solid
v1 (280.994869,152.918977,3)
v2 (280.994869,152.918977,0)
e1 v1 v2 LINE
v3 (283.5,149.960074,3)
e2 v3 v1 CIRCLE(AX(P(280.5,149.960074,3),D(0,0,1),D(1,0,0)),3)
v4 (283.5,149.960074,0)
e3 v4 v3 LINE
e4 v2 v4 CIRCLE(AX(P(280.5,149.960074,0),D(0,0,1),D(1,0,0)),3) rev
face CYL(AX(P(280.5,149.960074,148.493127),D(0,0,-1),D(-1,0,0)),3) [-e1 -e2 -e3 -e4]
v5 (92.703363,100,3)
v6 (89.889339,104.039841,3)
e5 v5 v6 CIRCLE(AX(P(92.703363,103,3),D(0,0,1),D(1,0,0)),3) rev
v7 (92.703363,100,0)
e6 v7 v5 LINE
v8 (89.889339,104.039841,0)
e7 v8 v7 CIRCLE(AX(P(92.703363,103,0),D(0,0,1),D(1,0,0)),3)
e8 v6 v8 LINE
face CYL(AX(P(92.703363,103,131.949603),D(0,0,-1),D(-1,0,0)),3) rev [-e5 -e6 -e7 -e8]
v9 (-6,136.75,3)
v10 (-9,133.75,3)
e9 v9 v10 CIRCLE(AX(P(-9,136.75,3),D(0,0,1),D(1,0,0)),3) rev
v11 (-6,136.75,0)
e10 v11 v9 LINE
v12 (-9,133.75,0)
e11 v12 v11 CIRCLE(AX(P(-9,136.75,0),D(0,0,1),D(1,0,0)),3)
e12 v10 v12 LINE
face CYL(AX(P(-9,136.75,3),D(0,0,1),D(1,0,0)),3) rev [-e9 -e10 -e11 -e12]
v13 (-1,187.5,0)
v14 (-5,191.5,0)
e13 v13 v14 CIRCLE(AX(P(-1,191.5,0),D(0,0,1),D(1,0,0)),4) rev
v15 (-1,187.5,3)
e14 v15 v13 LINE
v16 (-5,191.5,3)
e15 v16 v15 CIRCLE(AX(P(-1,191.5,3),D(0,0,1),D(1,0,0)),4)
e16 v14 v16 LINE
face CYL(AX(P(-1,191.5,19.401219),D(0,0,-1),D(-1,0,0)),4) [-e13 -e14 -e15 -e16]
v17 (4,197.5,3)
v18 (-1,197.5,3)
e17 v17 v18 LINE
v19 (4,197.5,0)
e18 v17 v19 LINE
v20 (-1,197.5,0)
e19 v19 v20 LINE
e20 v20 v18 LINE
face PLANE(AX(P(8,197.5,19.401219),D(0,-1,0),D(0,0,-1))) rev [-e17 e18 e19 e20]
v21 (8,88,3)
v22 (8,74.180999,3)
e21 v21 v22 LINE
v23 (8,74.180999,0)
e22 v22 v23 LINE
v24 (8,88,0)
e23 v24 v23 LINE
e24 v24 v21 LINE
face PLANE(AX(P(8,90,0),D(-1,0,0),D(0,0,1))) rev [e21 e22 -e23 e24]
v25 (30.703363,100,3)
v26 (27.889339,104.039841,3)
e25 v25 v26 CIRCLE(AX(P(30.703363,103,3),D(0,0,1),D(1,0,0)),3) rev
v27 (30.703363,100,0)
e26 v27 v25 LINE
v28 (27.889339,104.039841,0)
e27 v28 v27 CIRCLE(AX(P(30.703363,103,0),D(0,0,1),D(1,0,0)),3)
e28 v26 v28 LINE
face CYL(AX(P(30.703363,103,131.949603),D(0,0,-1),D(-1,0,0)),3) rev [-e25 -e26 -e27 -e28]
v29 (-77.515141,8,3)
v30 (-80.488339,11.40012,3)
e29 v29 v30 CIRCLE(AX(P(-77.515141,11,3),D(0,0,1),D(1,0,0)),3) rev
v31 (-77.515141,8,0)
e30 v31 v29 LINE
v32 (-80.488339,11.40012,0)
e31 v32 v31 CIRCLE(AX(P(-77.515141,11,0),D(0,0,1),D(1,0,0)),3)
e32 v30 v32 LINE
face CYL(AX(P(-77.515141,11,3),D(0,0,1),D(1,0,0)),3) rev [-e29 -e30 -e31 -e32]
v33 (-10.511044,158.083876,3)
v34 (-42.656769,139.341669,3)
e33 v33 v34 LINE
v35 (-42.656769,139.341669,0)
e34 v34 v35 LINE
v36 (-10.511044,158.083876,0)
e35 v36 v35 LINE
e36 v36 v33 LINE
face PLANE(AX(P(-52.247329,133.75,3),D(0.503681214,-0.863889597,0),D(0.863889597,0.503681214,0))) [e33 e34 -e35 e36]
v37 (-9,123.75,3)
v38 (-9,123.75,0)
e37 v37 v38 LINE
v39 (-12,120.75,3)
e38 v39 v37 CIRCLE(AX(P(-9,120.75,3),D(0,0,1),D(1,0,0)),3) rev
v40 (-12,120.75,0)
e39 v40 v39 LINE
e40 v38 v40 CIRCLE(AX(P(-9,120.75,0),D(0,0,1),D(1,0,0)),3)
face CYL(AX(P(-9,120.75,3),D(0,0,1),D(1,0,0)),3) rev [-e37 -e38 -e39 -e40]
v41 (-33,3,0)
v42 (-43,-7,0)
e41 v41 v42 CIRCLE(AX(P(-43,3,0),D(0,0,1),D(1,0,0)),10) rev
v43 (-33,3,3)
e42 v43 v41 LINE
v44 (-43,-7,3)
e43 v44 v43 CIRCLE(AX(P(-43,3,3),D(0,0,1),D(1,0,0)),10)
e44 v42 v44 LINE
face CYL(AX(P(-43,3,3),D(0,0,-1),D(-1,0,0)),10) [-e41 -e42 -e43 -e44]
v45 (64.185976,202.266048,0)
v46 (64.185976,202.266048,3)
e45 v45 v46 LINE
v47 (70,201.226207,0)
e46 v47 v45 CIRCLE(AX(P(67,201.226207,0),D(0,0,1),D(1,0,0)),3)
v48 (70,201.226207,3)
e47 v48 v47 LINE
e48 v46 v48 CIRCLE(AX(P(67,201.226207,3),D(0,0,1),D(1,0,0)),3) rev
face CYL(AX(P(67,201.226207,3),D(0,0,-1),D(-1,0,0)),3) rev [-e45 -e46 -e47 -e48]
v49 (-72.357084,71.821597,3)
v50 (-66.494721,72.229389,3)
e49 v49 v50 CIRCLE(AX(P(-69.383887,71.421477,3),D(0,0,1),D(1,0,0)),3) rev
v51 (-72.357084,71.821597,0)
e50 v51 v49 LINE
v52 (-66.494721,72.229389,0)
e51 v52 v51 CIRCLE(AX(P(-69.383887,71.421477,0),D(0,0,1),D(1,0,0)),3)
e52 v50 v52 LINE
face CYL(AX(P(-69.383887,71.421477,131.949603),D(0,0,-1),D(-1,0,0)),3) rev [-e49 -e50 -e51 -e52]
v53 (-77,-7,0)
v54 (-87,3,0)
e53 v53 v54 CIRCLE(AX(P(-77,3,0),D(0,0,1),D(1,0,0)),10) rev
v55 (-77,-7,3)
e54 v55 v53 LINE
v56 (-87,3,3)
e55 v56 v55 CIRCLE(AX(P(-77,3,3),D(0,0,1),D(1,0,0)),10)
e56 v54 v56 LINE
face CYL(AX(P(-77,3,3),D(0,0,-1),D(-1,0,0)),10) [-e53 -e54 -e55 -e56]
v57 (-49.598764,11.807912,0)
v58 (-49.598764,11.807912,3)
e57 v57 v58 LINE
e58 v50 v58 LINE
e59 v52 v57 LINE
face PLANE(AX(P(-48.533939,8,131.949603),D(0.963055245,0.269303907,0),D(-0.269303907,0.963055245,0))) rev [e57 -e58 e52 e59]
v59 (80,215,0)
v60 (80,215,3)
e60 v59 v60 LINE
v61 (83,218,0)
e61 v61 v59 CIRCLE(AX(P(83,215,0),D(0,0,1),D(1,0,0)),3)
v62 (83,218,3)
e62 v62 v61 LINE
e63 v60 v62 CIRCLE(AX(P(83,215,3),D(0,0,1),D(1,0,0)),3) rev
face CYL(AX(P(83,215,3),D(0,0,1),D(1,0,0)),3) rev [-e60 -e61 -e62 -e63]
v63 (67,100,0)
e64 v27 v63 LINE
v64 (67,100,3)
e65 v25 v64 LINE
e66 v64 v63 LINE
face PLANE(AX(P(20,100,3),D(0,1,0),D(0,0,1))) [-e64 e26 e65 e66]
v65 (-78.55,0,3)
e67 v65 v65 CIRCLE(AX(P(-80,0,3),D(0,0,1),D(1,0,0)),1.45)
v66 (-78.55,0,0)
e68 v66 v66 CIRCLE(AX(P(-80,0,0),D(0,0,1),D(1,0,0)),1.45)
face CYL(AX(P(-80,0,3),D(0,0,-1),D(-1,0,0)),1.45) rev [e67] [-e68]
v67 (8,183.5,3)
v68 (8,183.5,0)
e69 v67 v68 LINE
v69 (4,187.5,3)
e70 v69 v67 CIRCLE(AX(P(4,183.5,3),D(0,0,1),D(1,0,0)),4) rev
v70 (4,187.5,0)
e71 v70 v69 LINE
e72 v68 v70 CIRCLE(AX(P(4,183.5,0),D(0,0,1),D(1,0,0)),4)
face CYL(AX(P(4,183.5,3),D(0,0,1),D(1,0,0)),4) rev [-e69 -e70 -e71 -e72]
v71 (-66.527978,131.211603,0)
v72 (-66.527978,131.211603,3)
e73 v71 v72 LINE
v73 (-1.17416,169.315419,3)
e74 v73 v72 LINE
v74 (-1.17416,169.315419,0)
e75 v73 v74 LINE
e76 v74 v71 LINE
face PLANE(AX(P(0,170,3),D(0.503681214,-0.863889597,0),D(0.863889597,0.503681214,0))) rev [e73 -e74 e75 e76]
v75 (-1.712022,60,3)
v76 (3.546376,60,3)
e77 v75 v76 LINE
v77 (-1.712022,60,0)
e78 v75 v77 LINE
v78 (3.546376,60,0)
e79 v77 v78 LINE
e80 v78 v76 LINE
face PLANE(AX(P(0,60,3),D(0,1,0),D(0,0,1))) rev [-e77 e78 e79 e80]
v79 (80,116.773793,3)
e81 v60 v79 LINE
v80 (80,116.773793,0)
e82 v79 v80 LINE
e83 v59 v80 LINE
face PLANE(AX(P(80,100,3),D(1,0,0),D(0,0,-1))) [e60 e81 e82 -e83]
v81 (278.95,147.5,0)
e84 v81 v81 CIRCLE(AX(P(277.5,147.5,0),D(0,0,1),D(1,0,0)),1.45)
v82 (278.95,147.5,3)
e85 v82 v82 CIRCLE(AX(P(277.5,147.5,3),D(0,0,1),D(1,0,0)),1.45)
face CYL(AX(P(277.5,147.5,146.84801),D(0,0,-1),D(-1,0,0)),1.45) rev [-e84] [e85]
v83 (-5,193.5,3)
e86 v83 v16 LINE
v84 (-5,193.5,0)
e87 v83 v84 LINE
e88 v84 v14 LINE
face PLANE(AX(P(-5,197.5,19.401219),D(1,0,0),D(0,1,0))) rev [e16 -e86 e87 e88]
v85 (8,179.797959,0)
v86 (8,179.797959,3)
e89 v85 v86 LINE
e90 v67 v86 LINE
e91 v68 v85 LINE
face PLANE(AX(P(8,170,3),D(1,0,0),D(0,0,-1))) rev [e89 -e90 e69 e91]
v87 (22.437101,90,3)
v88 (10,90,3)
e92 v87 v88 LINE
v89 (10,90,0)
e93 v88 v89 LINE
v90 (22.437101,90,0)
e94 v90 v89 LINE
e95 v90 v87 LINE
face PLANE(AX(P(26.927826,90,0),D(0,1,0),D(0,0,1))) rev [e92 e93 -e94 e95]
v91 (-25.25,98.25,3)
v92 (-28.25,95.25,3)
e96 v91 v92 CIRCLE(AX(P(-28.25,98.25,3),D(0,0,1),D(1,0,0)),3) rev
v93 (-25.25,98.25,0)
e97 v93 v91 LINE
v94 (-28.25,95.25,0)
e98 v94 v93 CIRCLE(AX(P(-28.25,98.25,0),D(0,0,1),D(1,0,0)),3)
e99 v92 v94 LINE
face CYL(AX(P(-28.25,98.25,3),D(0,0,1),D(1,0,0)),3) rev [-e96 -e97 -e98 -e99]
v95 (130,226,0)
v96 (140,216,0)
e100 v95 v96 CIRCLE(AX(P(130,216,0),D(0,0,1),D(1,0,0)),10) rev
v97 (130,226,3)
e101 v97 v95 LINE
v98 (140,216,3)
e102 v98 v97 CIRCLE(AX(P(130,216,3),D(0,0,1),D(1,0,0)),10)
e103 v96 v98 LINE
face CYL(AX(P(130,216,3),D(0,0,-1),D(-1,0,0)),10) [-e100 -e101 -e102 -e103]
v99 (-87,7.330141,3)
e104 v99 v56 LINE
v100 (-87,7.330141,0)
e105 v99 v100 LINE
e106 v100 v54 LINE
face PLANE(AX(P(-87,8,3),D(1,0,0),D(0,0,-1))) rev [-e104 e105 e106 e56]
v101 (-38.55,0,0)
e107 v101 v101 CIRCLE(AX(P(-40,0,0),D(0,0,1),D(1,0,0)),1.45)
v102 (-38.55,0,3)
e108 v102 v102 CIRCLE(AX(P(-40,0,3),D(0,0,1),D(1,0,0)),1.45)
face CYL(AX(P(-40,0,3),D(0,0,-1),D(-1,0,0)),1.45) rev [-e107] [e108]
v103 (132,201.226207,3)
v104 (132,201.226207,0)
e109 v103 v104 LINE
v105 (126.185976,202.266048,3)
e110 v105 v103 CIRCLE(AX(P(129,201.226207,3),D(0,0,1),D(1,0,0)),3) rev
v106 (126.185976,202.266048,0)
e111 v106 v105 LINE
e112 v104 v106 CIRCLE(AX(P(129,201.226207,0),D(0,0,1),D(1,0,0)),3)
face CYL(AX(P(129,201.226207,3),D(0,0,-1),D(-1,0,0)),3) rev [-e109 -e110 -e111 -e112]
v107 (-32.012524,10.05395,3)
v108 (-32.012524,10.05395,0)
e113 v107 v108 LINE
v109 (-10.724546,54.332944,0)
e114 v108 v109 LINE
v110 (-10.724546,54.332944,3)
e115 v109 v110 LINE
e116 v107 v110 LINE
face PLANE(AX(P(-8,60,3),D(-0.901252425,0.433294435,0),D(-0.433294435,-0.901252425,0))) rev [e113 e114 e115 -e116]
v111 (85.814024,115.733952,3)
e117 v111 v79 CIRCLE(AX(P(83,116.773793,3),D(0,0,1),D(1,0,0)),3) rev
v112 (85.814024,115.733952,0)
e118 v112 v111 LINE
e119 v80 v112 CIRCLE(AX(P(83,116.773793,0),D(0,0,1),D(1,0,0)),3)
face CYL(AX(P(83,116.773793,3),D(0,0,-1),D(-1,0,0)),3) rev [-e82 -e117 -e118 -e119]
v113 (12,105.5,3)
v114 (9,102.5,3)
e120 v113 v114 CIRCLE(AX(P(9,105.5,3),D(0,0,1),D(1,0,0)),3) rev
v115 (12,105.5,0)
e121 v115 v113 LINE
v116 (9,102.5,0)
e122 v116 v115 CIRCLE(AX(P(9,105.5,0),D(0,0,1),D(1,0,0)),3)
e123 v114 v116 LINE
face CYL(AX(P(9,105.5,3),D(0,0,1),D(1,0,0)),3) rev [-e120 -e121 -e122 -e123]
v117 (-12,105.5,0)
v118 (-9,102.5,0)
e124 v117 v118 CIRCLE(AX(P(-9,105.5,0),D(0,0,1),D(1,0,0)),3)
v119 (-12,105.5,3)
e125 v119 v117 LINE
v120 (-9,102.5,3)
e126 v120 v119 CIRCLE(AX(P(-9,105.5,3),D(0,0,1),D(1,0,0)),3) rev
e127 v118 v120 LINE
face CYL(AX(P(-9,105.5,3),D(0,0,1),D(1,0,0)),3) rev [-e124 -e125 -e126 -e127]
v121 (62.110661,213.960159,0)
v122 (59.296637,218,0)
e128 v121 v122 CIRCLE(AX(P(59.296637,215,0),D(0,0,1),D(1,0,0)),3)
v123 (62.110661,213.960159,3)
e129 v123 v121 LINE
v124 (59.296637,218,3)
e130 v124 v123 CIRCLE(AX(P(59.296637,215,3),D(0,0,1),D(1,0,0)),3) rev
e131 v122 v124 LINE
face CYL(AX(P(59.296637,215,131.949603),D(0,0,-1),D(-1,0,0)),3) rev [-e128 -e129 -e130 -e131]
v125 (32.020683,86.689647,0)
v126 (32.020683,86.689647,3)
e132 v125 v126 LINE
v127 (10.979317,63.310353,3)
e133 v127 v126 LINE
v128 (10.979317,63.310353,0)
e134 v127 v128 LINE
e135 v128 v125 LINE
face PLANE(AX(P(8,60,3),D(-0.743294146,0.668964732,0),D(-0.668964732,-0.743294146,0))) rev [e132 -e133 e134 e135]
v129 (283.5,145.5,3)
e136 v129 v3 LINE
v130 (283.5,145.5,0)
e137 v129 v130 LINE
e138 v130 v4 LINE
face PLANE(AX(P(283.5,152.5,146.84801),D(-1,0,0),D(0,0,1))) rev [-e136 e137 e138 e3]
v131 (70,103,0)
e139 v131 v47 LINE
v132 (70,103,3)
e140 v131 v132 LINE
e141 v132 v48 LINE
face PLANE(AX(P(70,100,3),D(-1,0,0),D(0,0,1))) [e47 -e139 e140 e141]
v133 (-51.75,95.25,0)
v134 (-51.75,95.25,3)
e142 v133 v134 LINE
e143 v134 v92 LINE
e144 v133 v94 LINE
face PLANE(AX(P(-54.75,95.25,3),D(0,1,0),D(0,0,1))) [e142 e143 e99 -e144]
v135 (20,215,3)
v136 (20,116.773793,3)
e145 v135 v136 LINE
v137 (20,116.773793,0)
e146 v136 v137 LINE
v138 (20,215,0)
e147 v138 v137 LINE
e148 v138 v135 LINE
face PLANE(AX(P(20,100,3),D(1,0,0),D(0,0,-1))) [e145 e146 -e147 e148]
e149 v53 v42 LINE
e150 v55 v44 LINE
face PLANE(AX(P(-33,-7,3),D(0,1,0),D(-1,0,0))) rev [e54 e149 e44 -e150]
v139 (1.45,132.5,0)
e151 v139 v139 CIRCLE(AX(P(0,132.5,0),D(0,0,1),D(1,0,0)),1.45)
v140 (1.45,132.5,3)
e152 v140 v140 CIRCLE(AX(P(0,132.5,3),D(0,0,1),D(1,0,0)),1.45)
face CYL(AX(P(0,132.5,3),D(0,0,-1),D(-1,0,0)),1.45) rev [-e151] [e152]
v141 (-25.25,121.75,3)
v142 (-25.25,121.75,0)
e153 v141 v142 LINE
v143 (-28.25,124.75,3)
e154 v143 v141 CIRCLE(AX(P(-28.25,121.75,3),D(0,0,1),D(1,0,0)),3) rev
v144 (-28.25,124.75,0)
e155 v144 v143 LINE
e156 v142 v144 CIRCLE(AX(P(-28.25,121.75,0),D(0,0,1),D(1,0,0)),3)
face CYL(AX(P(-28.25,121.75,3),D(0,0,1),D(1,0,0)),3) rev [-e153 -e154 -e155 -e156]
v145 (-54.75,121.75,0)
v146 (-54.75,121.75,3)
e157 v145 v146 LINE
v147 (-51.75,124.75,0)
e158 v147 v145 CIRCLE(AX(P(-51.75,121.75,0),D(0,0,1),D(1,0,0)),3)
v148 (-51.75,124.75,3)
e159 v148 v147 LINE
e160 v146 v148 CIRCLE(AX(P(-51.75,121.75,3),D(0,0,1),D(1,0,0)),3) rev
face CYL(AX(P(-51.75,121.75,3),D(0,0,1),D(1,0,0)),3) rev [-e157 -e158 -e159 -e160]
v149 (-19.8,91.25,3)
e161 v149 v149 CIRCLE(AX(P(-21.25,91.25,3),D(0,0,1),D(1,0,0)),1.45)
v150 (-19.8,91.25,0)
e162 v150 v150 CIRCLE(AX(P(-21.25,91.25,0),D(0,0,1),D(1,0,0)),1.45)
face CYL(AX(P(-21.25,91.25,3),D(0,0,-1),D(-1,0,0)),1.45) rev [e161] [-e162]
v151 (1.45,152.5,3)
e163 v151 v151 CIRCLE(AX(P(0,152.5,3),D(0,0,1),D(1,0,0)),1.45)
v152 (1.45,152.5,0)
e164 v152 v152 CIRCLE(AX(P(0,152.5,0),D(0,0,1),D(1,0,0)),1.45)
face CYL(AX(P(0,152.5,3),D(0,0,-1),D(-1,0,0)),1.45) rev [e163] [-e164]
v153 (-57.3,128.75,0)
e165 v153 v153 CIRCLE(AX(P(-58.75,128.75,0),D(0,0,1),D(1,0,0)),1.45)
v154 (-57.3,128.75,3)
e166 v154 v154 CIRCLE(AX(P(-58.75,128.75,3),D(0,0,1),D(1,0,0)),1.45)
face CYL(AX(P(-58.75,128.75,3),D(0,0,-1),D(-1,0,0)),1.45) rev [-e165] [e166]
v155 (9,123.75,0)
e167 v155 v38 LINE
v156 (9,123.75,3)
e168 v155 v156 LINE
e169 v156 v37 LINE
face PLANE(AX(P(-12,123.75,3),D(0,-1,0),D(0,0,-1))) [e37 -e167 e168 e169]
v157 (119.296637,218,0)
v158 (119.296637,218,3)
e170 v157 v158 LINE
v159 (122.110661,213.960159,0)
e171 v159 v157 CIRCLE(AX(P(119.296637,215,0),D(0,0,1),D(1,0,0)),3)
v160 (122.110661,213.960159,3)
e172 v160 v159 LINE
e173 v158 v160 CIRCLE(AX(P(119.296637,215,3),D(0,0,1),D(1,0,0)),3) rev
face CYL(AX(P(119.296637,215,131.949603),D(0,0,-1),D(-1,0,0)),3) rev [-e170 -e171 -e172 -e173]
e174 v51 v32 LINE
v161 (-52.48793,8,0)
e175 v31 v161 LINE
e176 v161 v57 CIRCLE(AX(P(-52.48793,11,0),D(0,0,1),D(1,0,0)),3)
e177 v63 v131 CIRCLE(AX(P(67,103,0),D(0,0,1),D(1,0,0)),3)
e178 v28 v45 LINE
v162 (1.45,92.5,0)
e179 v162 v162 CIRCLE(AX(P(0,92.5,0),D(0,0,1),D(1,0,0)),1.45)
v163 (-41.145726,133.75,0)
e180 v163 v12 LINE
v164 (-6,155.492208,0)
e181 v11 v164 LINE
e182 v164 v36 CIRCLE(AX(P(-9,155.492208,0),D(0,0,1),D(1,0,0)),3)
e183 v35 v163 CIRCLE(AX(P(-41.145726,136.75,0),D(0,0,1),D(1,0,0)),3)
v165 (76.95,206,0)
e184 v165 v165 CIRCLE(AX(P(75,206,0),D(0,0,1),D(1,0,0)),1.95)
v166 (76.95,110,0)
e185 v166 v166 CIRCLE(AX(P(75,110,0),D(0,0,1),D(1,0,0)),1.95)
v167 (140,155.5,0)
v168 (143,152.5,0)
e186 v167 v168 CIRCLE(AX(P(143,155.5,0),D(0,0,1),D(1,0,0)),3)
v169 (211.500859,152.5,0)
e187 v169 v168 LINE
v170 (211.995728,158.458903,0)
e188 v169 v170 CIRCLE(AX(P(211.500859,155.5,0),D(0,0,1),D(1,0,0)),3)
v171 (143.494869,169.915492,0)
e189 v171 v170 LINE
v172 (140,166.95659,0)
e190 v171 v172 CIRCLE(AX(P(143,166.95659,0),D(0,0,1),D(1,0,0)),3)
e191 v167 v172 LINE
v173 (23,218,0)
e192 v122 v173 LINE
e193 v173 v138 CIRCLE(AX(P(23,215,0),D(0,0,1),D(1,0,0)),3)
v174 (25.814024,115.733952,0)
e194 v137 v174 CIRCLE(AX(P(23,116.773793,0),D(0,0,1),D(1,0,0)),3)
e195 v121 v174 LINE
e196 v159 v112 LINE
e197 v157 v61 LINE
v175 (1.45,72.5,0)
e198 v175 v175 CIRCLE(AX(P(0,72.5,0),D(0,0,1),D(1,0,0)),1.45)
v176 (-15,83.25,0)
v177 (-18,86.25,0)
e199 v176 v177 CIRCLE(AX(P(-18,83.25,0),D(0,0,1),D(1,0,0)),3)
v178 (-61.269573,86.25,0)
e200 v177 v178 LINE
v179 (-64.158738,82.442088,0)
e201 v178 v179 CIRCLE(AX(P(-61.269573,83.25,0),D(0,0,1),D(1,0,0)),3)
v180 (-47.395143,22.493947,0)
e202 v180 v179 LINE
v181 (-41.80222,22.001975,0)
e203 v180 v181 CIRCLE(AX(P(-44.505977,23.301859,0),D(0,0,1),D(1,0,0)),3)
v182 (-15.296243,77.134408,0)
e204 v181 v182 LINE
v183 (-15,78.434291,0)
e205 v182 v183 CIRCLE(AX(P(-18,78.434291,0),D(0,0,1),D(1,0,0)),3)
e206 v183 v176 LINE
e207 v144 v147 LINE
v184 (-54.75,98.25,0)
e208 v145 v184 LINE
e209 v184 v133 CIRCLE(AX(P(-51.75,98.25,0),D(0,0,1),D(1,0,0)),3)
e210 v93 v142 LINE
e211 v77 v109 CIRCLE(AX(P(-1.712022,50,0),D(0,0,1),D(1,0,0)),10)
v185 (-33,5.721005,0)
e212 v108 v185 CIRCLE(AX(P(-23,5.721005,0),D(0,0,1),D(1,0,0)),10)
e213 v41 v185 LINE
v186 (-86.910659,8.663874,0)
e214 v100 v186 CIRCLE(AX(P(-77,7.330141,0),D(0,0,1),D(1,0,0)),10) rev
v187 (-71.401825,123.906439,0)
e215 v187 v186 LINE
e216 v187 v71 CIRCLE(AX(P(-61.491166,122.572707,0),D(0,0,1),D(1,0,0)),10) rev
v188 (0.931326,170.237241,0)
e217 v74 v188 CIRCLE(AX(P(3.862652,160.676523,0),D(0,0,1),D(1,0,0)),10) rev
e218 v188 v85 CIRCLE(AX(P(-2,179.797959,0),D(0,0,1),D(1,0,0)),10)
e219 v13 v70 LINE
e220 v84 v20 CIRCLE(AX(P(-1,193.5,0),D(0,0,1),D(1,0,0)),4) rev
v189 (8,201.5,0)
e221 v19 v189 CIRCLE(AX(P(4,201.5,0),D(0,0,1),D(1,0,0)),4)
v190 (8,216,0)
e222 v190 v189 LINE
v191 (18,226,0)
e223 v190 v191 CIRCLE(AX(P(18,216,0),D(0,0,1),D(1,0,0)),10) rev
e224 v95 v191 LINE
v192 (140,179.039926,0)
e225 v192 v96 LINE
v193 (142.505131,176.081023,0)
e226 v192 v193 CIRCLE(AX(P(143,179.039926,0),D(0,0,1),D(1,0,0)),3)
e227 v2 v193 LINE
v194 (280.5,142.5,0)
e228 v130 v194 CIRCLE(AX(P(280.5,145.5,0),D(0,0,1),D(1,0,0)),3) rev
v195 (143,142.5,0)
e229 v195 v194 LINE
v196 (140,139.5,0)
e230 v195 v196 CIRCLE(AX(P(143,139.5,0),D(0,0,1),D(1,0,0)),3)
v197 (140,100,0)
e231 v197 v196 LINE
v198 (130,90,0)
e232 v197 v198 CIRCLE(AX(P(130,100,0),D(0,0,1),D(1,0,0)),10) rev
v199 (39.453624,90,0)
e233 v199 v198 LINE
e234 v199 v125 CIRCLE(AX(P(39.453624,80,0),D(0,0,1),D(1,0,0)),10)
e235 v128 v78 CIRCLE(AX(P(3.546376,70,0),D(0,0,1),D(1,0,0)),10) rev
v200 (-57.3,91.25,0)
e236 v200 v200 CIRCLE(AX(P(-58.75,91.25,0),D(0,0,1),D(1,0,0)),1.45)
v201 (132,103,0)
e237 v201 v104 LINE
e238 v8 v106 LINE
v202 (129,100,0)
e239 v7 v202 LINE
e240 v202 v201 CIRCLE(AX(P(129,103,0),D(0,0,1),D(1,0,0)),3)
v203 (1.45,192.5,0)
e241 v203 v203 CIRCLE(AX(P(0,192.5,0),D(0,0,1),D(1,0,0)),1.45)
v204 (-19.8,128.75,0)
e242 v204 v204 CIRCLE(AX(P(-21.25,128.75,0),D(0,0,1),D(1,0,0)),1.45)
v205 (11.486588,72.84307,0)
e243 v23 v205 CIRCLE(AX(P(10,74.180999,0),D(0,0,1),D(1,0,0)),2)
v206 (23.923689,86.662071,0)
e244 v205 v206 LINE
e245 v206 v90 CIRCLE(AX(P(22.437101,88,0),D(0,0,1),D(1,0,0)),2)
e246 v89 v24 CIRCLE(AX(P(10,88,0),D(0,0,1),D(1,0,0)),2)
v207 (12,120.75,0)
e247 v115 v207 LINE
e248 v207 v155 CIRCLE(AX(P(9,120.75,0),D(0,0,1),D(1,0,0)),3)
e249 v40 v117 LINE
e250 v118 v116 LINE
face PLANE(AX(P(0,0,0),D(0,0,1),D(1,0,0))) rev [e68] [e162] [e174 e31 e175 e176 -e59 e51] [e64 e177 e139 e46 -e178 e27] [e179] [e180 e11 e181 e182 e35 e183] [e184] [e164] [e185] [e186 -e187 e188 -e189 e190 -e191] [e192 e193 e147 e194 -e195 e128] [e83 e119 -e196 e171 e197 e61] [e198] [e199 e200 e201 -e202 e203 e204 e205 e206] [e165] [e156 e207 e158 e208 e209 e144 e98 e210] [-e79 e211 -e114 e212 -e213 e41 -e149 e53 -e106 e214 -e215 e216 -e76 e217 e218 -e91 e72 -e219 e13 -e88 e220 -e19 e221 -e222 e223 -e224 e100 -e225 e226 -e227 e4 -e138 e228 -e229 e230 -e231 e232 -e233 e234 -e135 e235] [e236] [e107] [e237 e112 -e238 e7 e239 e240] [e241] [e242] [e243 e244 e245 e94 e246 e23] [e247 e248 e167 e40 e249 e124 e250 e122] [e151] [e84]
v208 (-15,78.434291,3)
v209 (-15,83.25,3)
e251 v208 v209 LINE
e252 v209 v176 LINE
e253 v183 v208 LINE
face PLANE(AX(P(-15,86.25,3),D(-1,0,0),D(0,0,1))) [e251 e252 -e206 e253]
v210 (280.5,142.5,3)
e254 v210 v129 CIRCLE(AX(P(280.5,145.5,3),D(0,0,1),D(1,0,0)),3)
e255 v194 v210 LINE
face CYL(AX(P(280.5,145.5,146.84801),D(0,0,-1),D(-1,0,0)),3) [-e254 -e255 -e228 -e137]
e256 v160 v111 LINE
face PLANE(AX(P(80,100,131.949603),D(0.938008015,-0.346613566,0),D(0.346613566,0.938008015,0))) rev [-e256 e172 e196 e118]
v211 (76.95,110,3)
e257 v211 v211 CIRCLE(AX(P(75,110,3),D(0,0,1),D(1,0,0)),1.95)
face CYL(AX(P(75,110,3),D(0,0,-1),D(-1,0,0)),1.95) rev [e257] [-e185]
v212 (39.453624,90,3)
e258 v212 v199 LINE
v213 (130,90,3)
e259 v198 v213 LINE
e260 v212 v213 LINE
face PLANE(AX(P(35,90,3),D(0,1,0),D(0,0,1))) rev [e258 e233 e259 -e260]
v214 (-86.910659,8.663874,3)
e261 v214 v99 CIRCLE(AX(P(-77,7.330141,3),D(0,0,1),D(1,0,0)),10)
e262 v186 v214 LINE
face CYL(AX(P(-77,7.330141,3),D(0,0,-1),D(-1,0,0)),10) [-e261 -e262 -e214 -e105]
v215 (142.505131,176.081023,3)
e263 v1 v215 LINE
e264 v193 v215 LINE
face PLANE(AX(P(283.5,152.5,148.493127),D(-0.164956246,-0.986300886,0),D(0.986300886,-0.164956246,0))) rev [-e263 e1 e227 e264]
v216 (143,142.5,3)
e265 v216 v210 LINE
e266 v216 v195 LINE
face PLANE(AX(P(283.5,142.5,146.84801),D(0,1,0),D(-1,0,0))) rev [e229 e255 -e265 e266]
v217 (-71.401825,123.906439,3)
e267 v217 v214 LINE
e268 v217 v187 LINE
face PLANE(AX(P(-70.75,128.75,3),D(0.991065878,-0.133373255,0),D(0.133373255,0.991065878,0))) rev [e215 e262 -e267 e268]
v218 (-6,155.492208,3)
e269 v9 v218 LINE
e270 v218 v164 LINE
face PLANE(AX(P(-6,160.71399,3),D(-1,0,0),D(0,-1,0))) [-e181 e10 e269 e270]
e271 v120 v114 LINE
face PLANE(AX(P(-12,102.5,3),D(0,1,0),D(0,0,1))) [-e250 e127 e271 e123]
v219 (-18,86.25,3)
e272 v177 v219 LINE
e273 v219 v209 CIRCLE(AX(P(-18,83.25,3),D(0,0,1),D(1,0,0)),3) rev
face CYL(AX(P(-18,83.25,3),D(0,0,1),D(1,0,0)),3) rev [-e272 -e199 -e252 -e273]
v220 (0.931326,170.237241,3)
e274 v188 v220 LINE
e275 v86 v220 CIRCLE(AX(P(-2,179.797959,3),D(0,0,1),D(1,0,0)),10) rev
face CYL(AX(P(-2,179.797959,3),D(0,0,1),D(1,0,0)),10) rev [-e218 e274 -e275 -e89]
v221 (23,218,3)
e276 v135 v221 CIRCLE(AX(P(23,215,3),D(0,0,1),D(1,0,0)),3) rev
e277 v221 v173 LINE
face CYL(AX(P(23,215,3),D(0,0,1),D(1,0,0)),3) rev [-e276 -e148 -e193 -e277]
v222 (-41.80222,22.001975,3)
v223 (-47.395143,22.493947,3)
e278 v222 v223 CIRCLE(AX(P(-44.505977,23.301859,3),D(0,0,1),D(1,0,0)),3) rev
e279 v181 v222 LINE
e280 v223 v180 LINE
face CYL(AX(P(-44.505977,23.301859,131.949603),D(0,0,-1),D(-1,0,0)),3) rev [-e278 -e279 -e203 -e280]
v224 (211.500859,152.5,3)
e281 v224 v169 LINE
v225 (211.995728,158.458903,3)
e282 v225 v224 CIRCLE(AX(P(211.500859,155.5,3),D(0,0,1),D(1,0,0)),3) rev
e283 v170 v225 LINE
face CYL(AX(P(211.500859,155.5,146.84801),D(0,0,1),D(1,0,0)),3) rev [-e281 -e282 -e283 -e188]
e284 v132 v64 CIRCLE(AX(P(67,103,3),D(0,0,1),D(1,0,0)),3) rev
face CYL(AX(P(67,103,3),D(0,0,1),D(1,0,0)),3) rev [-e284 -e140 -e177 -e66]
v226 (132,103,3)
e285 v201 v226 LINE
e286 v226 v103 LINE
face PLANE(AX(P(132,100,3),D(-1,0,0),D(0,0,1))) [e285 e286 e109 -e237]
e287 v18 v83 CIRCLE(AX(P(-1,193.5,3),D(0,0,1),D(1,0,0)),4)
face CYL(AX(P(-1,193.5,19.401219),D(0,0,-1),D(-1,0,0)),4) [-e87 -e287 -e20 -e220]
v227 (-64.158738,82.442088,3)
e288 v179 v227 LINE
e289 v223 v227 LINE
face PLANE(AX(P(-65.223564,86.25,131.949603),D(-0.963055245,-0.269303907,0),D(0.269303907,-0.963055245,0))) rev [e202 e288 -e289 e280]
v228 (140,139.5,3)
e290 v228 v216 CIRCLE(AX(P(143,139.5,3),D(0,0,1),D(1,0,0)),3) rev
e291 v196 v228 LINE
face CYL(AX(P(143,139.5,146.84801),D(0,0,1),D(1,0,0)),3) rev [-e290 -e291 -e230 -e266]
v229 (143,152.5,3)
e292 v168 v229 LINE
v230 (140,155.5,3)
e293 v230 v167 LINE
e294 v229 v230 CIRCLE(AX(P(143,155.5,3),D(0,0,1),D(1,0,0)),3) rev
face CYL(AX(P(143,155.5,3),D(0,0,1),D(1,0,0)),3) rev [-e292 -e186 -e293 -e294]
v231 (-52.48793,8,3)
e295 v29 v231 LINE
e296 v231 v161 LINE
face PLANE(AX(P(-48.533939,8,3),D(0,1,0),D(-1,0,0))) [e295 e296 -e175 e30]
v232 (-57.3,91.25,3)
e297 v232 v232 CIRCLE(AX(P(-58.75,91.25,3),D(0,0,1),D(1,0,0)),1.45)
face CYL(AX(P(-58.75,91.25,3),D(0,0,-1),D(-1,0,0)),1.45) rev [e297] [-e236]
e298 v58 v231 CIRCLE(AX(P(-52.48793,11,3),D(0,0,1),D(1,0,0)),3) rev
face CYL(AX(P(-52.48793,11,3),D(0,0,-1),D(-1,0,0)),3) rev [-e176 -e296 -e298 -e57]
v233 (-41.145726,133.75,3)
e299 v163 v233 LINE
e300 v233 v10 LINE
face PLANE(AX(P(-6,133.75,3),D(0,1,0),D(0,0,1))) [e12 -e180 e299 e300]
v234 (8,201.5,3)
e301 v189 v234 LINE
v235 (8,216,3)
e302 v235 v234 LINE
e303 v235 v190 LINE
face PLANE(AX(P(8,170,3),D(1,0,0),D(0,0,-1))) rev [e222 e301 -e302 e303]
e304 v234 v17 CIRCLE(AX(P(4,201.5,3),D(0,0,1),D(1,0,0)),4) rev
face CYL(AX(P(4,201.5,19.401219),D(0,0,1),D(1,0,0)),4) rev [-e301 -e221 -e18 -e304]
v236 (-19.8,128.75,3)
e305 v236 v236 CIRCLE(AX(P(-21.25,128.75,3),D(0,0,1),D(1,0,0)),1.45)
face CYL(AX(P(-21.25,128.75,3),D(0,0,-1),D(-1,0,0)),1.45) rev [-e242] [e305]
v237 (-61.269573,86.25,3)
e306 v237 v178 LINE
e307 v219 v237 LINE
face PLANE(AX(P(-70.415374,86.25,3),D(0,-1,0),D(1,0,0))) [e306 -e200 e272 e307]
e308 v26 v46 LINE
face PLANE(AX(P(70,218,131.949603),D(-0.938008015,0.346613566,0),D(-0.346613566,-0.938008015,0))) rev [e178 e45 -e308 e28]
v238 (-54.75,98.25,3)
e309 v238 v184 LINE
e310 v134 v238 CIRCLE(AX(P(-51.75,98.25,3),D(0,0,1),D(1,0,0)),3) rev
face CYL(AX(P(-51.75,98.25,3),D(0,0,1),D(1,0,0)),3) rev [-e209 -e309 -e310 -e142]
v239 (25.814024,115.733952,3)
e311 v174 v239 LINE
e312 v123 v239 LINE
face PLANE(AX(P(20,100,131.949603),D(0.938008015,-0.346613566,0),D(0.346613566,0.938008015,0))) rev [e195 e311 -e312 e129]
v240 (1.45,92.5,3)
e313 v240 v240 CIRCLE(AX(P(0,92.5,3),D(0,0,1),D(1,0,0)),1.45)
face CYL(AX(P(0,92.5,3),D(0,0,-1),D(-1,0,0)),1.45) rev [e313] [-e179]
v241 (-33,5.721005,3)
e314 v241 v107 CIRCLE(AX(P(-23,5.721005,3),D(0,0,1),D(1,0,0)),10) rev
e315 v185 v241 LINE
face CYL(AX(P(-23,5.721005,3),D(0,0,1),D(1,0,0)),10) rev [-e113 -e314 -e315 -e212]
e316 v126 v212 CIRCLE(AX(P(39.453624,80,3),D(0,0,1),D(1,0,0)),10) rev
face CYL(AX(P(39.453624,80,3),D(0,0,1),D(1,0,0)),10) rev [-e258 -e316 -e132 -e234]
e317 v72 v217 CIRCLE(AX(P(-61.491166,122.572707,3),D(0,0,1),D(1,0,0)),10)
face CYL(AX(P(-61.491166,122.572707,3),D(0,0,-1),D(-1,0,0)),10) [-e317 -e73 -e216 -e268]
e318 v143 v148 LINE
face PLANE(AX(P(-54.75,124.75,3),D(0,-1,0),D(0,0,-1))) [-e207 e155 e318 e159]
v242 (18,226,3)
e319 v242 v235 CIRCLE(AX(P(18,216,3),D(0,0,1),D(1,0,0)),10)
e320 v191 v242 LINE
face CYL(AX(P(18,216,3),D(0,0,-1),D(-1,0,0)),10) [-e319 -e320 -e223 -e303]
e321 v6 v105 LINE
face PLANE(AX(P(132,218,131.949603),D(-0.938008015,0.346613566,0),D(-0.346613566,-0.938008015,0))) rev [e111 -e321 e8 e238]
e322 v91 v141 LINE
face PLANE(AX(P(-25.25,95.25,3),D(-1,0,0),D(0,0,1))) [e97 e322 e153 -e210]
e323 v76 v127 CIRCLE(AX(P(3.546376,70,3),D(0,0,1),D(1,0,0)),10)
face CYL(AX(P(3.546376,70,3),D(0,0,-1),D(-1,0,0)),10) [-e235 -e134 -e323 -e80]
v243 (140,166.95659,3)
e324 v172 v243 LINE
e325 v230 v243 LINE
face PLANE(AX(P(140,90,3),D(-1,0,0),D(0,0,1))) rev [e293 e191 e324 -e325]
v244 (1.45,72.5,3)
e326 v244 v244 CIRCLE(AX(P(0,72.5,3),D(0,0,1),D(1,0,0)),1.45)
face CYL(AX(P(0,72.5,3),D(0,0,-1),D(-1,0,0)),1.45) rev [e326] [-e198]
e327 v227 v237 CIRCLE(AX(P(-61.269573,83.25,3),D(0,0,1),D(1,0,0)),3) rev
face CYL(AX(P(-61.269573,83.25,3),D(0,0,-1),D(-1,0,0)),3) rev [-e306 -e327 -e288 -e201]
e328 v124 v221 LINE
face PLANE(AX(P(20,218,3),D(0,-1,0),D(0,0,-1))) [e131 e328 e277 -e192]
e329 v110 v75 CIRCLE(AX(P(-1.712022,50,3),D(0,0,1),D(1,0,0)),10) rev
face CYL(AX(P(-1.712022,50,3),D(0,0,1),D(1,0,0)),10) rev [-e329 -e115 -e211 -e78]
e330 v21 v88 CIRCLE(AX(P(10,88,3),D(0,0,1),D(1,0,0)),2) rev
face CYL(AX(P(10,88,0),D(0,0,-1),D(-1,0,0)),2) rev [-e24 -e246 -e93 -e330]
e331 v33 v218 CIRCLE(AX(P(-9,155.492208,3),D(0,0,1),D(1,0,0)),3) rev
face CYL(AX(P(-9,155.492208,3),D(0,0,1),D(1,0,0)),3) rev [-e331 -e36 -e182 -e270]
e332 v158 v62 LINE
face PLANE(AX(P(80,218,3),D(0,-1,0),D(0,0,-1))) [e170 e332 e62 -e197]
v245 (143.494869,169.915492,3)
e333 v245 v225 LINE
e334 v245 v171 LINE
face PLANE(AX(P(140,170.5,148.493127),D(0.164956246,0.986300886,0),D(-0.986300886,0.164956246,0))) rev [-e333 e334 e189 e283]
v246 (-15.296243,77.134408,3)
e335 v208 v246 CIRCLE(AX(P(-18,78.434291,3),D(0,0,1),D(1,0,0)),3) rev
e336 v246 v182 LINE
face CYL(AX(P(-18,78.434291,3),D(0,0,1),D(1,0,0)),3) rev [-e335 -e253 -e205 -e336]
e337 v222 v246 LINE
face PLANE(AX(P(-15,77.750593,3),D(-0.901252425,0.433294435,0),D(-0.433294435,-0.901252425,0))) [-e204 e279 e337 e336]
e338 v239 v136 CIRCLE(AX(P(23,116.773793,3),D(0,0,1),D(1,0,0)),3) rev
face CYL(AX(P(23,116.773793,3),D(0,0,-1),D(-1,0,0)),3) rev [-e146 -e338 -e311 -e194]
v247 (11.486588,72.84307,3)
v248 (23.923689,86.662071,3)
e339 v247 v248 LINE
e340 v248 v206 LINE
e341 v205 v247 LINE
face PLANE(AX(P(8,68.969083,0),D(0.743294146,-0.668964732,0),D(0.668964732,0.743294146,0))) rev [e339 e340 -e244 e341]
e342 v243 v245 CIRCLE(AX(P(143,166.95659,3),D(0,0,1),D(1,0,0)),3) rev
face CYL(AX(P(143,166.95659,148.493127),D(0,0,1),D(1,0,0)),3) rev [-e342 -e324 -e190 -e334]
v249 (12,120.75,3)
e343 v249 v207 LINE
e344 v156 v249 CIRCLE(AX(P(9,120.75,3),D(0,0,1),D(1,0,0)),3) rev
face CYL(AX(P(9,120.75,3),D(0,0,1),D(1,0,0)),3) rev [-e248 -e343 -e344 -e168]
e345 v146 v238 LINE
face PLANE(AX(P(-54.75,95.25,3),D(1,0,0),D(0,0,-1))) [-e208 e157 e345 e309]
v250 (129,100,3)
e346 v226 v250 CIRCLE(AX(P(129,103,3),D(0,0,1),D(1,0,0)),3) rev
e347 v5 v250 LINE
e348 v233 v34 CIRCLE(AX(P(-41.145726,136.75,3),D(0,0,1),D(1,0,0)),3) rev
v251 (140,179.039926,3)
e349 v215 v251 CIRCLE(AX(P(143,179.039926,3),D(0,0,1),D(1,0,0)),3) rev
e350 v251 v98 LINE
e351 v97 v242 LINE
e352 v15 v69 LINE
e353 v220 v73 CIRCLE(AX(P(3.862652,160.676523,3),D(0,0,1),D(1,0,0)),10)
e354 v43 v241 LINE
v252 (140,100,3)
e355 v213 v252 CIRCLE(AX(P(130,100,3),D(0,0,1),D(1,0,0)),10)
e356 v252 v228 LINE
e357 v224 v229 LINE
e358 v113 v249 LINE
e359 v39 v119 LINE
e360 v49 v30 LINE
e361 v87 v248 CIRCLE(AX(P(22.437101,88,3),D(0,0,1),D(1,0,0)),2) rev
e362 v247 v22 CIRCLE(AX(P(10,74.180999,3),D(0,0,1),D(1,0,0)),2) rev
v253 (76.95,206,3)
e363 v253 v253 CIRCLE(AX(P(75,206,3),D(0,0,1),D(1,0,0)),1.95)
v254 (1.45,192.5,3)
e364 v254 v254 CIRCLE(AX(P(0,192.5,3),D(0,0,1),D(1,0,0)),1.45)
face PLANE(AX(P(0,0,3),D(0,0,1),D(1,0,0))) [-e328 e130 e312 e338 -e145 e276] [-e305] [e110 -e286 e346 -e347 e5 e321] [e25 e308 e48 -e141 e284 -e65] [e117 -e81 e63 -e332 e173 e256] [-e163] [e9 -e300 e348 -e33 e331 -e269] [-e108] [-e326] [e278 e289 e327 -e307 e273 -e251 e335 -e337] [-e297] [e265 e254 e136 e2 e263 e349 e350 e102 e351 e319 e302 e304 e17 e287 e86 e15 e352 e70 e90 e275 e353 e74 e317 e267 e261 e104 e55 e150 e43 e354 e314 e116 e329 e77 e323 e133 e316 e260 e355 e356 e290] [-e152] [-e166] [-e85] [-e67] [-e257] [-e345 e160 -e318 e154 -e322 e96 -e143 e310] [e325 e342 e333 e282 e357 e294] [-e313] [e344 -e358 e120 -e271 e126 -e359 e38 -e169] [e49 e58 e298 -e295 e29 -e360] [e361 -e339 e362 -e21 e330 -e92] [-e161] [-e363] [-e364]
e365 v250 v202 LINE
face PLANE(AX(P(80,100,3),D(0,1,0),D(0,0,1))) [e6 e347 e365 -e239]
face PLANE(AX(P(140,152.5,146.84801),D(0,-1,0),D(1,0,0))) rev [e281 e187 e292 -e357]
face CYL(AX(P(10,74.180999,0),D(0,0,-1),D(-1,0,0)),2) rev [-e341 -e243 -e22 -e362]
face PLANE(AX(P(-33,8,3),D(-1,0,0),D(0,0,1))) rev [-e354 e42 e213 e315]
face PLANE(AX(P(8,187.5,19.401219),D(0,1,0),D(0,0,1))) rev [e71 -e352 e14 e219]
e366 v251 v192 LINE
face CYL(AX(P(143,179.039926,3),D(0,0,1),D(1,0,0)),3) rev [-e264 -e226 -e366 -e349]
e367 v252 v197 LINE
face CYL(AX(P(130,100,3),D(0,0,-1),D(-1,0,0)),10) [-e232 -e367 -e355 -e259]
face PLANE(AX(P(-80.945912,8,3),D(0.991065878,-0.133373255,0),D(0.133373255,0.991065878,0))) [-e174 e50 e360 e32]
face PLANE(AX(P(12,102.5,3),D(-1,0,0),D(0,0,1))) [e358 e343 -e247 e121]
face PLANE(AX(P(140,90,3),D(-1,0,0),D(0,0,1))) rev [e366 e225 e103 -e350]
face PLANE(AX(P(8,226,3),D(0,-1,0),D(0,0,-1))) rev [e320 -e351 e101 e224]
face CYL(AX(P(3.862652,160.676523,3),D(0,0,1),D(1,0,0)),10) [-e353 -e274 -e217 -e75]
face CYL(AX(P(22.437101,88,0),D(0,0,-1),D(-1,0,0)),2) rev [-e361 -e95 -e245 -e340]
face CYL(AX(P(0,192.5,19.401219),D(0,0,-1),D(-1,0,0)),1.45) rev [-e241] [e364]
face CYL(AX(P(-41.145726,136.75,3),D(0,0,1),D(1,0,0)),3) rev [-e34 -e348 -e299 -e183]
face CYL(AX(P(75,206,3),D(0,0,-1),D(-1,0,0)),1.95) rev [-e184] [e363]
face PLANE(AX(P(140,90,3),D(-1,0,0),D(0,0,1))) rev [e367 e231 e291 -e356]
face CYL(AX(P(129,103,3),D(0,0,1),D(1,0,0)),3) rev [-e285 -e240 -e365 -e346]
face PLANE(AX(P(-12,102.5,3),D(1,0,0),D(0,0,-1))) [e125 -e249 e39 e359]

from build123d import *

# Parameters (mm, degrees)
SKETCH_1_R          = 1.45
SKETCH_1_R_2        = 1.95
SKETCH_1_W          = 50
SKETCH_1_H          = 118
SKETCH_1_W_2        = 52
SKETCH_1_W_3        = 29.5
SKETCH_1_H_2        = 29.5
SKETCH_1_W_4        = 24
SKETCH_1_H_3        = 21.25
EXTRUDE_1_DEPTH     = 3
EXTRUDE_2_DEPTH     = 3
FILLET_1_R          = 3
FILLET_2_R          = 10
FILLET_3_R          = 10
SKETCH_3_W          = 13
SKETCH_3_H          = 10
SKETCH_3_R          = 1.45
EXTRUDE_3_DEPTH     = 3
FILLET_4_R          = 4
SKETCH_4_W          = 143.5
SKETCH_4_H          = 10
SKETCH_4_R          = 1.45
EXTRUDE_4_DEPTH     = 3
EXTRUDE_5_DEPTH     = 3
FILLET_5_R          = 3
CUT_EXTRUDE_1_DEPTH = 363.570338004
FILLET_6_R          = 2


with BuildPart() as part:
    # 草图1 → 凸台-拉伸1 (new body)
    with BuildSketch(Plane.XY):
        Polygon((0, 60), (-8, 60), (-33, 8), (-33, -7), (-87, -7), (-87, 8), (-70.75, 128.75), (0, 170), (8, 170), (8, 226), (140, 226), (140, 90), (35, 90), (8, 60), align=None)
        with Locations((-80, 0)):
            Circle(SKETCH_1_R, mode=Mode.SUBTRACT)
        with Locations((-40, 0)):
            Circle(SKETCH_1_R, mode=Mode.SUBTRACT)
        with Locations((0, 72.5)):
            Circle(SKETCH_1_R, mode=Mode.SUBTRACT)
        with Locations((0, 92.5)):
            Circle(SKETCH_1_R, mode=Mode.SUBTRACT)
        with Locations((0, 132.5)):
            Circle(SKETCH_1_R, mode=Mode.SUBTRACT)
        with Locations((0, 152.5)):
            Circle(SKETCH_1_R, mode=Mode.SUBTRACT)
        with Locations((-58.75, 128.75)):
            Circle(SKETCH_1_R, mode=Mode.SUBTRACT)
        with Locations((-21.25, 128.75)):
            Circle(SKETCH_1_R, mode=Mode.SUBTRACT)
        with Locations((-21.25, 91.25)):
            Circle(SKETCH_1_R, mode=Mode.SUBTRACT)
        with Locations((-58.75, 91.25)):
            Circle(SKETCH_1_R, mode=Mode.SUBTRACT)
        with Locations((75, 206)):
            Circle(SKETCH_1_R_2, mode=Mode.SUBTRACT)
        with Locations((75, 110)):
            Circle(SKETCH_1_R_2, mode=Mode.SUBTRACT)
        with Locations((45, 159)):
            Rectangle(SKETCH_1_W, SKETCH_1_H, mode=Mode.SUBTRACT)
        with Locations((106, 159)):
            Rectangle(SKETCH_1_W_2, SKETCH_1_H, mode=Mode.SUBTRACT)
        Polygon((-15, 77.75059269), (-48.533938793, 8), (-80.945912041, 8), (-70.415373738, 86.25), (-15, 86.25), align=None, mode=Mode.SUBTRACT)
        Polygon((-52.247328604, 133.75), (-6, 160.713990175), (-6, 133.75), align=None, mode=Mode.SUBTRACT)
        with Locations((-40, 110)):
            Rectangle(SKETCH_1_W_3, SKETCH_1_H_2, mode=Mode.SUBTRACT)
        with Locations((0, 113.125)):
            Rectangle(SKETCH_1_W_4, SKETCH_1_H_3, mode=Mode.SUBTRACT)
    extrude(amount=EXTRUDE_1_DEPTH)

    # 草图2 → 凸台-拉伸2 (add)
    with BuildSketch(Plane.XY):
        Polygon((70, 218), (26.39653383, 100), (20, 100), (63.60346617, 218), align=None)
        Polygon((80, 100), (123.60346617, 218), (132, 218), (88.39653383, 100), align=None)
        Polygon((-48.533938793, 8), (-70.415373738, 86.25), (-65.223563587, 86.25), (-45.251391654, 14.82769805), align=None)
    extrude(amount=EXTRUDE_2_DEPTH)

    # 圆角1
    fillet_1_edges = [part.edges().sort_by_distance(p)[0] for p in [
        (-15, 77.75059269, 1.5),
        (-15, 86.25, 1.5),
        (-70.415373738, 86.25, 1.5),
        (-80.945912041, 8, 1.5),
        (-48.533938793, 8, 1.5),
        (-25.25, 95.25, 1.5),
        (-25.25, 124.75, 1.5),
        (-54.75, 124.75, 1.5),
        (-54.75, 95.25, 1.5),
        (-52.247328604, 133.75, 1.5),
        (-6, 133.75, 1.5),
        (-6, 160.713990175, 1.5),
        (12, 102.5, 1.5),
        (12, 123.75, 1.5),
        (-12, 123.75, 1.5),
        (-12, 102.5, 1.5),
        (-45.251391654, 14.82769805, 1.5),
        (-65.223563587, 86.25, 1.5),
        (88.39653383, 100, 1.5),
        (123.60346617, 218, 1.5),
        (63.60346617, 218, 1.5),
        (26.39653383, 100, 1.5),
        (70, 100, 1.5),
        (70, 218, 1.5),
        (20, 218, 1.5),
        (20, 100, 1.5),
        (132, 100, 1.5),
        (132, 218, 1.5),
        (80, 218, 1.5),
        (80, 100, 1.5),
    ]]
    fillet(fillet_1_edges, radius=FILLET_1_R)

    # 圆角2
    # the kernel refuses this fillet: 10 mm, written as the material it adds along each edge
    with BuildSketch(Plane(origin=(8, 170, 0), x_dir=(-1, 0, 0), z_dir=(0, 0, 1))) as fillet_2_piece_1:
        with BuildLine():
            CenterArc((10, -9.797958971), FILLET_2_R, 101.536959033, 78.463040967)
            Line((0, -9.797958971), (-0.2, -9.797958971))
            Line((-0.2, -9.797958971), (-0.2, 0))
            Line((-0.2, 0), (0, 0.2))
            ThreePointArc((0, 0.2), (4, 0.2), (7.96, 0.195959179))
            Line((7.96, 0.195959179), (8, 0))
        make_face()
    extrude(amount=3)

    # 圆角3
    fillet_3_edges = [part.edges().sort_by_distance(p)[0] for p in [
        (-8, 60, 1.5),
        (-33, 8, 1.5),
        (-33, -7, 1.5),
        (-87, -7, 1.5),
        (-87, 8, 1.5),
        (-70.75, 128.75, 1.5),
        (0, 170, 1.5),
        (8, 226, 1.5),
        (140, 226, 1.5),
        (140, 90, 1.5),
        (35, 90, 1.5),
        (8, 60, 1.5),
    ]]
    fillet(fillet_3_edges, radius=FILLET_3_R)

    # 草图3 → 凸台-拉伸3 (add)
    with BuildSketch(Plane.XY):
        with Locations((1.5, 192.5)):
            Rectangle(SKETCH_3_W, SKETCH_3_H)
        with Locations((0, 192.5)):
            Circle(SKETCH_3_R, mode=Mode.SUBTRACT)
    extrude(amount=EXTRUDE_3_DEPTH)

    # 圆角4
    fillet_4_edges = [part.edges().sort_by_distance(p)[0] for p in [
        (-5, 187.5, 1.5),
        (-5, 197.5, 1.5),
        (8, 197.5, 1.5),
        (8, 187.5, 1.5),
    ]]
    fillet(fillet_4_edges, radius=FILLET_4_R)

    # 草图4 → 凸台-拉伸4 (add)
    with BuildSketch(Plane.XY):
        with Locations((211.75, 147.5)):
            Rectangle(SKETCH_4_W, SKETCH_4_H)
        with Locations((277.5, 147.5)):
            Circle(SKETCH_4_R, mode=Mode.SUBTRACT)
    extrude(amount=EXTRUDE_4_DEPTH)

    # 草图5 → 凸台-拉伸5 (add)
    with BuildSketch(Plane.XY):
        Polygon((283.5, 152.5), (140, 176.5), (140, 170.5), (247.625, 152.5), align=None)
    extrude(amount=EXTRUDE_5_DEPTH)

    # 圆角5
    fillet_5_edges = [part.edges().sort_by_distance(p)[0] for p in [
        (283.5, 152.5, 1.5),
        (283.5, 142.5, 1.5),
        (140, 142.5, 1.5),
        (140, 152.5, 1.5),
        (247.625, 152.5, 1.5),
        (140, 176.5, 1.5),
        (140, 170.5, 1.5),
    ]]
    fillet(fillet_5_edges, radius=FILLET_5_R)

    # 草图6 → 切除-拉伸1 (cut, through all)
    with BuildSketch(Plane.XY.offset(3)):
        Polygon((8, 90), (8, 68.969082698), (26.927825572, 90), align=None)
    extrude(amount=-CUT_EXTRUDE_1_DEPTH, mode=Mode.SUBTRACT)

    # 圆角6
    fillet_6_edges = [part.edges().sort_by_distance(p)[0] for p in [
        (8, 90, 1.5),
        (26.927825572, 90, 1.5),
        (8, 68.969082698, 1.5),
    ]]
    fillet(fillet_6_edges, radius=FILLET_6_R)


solid = part.part
